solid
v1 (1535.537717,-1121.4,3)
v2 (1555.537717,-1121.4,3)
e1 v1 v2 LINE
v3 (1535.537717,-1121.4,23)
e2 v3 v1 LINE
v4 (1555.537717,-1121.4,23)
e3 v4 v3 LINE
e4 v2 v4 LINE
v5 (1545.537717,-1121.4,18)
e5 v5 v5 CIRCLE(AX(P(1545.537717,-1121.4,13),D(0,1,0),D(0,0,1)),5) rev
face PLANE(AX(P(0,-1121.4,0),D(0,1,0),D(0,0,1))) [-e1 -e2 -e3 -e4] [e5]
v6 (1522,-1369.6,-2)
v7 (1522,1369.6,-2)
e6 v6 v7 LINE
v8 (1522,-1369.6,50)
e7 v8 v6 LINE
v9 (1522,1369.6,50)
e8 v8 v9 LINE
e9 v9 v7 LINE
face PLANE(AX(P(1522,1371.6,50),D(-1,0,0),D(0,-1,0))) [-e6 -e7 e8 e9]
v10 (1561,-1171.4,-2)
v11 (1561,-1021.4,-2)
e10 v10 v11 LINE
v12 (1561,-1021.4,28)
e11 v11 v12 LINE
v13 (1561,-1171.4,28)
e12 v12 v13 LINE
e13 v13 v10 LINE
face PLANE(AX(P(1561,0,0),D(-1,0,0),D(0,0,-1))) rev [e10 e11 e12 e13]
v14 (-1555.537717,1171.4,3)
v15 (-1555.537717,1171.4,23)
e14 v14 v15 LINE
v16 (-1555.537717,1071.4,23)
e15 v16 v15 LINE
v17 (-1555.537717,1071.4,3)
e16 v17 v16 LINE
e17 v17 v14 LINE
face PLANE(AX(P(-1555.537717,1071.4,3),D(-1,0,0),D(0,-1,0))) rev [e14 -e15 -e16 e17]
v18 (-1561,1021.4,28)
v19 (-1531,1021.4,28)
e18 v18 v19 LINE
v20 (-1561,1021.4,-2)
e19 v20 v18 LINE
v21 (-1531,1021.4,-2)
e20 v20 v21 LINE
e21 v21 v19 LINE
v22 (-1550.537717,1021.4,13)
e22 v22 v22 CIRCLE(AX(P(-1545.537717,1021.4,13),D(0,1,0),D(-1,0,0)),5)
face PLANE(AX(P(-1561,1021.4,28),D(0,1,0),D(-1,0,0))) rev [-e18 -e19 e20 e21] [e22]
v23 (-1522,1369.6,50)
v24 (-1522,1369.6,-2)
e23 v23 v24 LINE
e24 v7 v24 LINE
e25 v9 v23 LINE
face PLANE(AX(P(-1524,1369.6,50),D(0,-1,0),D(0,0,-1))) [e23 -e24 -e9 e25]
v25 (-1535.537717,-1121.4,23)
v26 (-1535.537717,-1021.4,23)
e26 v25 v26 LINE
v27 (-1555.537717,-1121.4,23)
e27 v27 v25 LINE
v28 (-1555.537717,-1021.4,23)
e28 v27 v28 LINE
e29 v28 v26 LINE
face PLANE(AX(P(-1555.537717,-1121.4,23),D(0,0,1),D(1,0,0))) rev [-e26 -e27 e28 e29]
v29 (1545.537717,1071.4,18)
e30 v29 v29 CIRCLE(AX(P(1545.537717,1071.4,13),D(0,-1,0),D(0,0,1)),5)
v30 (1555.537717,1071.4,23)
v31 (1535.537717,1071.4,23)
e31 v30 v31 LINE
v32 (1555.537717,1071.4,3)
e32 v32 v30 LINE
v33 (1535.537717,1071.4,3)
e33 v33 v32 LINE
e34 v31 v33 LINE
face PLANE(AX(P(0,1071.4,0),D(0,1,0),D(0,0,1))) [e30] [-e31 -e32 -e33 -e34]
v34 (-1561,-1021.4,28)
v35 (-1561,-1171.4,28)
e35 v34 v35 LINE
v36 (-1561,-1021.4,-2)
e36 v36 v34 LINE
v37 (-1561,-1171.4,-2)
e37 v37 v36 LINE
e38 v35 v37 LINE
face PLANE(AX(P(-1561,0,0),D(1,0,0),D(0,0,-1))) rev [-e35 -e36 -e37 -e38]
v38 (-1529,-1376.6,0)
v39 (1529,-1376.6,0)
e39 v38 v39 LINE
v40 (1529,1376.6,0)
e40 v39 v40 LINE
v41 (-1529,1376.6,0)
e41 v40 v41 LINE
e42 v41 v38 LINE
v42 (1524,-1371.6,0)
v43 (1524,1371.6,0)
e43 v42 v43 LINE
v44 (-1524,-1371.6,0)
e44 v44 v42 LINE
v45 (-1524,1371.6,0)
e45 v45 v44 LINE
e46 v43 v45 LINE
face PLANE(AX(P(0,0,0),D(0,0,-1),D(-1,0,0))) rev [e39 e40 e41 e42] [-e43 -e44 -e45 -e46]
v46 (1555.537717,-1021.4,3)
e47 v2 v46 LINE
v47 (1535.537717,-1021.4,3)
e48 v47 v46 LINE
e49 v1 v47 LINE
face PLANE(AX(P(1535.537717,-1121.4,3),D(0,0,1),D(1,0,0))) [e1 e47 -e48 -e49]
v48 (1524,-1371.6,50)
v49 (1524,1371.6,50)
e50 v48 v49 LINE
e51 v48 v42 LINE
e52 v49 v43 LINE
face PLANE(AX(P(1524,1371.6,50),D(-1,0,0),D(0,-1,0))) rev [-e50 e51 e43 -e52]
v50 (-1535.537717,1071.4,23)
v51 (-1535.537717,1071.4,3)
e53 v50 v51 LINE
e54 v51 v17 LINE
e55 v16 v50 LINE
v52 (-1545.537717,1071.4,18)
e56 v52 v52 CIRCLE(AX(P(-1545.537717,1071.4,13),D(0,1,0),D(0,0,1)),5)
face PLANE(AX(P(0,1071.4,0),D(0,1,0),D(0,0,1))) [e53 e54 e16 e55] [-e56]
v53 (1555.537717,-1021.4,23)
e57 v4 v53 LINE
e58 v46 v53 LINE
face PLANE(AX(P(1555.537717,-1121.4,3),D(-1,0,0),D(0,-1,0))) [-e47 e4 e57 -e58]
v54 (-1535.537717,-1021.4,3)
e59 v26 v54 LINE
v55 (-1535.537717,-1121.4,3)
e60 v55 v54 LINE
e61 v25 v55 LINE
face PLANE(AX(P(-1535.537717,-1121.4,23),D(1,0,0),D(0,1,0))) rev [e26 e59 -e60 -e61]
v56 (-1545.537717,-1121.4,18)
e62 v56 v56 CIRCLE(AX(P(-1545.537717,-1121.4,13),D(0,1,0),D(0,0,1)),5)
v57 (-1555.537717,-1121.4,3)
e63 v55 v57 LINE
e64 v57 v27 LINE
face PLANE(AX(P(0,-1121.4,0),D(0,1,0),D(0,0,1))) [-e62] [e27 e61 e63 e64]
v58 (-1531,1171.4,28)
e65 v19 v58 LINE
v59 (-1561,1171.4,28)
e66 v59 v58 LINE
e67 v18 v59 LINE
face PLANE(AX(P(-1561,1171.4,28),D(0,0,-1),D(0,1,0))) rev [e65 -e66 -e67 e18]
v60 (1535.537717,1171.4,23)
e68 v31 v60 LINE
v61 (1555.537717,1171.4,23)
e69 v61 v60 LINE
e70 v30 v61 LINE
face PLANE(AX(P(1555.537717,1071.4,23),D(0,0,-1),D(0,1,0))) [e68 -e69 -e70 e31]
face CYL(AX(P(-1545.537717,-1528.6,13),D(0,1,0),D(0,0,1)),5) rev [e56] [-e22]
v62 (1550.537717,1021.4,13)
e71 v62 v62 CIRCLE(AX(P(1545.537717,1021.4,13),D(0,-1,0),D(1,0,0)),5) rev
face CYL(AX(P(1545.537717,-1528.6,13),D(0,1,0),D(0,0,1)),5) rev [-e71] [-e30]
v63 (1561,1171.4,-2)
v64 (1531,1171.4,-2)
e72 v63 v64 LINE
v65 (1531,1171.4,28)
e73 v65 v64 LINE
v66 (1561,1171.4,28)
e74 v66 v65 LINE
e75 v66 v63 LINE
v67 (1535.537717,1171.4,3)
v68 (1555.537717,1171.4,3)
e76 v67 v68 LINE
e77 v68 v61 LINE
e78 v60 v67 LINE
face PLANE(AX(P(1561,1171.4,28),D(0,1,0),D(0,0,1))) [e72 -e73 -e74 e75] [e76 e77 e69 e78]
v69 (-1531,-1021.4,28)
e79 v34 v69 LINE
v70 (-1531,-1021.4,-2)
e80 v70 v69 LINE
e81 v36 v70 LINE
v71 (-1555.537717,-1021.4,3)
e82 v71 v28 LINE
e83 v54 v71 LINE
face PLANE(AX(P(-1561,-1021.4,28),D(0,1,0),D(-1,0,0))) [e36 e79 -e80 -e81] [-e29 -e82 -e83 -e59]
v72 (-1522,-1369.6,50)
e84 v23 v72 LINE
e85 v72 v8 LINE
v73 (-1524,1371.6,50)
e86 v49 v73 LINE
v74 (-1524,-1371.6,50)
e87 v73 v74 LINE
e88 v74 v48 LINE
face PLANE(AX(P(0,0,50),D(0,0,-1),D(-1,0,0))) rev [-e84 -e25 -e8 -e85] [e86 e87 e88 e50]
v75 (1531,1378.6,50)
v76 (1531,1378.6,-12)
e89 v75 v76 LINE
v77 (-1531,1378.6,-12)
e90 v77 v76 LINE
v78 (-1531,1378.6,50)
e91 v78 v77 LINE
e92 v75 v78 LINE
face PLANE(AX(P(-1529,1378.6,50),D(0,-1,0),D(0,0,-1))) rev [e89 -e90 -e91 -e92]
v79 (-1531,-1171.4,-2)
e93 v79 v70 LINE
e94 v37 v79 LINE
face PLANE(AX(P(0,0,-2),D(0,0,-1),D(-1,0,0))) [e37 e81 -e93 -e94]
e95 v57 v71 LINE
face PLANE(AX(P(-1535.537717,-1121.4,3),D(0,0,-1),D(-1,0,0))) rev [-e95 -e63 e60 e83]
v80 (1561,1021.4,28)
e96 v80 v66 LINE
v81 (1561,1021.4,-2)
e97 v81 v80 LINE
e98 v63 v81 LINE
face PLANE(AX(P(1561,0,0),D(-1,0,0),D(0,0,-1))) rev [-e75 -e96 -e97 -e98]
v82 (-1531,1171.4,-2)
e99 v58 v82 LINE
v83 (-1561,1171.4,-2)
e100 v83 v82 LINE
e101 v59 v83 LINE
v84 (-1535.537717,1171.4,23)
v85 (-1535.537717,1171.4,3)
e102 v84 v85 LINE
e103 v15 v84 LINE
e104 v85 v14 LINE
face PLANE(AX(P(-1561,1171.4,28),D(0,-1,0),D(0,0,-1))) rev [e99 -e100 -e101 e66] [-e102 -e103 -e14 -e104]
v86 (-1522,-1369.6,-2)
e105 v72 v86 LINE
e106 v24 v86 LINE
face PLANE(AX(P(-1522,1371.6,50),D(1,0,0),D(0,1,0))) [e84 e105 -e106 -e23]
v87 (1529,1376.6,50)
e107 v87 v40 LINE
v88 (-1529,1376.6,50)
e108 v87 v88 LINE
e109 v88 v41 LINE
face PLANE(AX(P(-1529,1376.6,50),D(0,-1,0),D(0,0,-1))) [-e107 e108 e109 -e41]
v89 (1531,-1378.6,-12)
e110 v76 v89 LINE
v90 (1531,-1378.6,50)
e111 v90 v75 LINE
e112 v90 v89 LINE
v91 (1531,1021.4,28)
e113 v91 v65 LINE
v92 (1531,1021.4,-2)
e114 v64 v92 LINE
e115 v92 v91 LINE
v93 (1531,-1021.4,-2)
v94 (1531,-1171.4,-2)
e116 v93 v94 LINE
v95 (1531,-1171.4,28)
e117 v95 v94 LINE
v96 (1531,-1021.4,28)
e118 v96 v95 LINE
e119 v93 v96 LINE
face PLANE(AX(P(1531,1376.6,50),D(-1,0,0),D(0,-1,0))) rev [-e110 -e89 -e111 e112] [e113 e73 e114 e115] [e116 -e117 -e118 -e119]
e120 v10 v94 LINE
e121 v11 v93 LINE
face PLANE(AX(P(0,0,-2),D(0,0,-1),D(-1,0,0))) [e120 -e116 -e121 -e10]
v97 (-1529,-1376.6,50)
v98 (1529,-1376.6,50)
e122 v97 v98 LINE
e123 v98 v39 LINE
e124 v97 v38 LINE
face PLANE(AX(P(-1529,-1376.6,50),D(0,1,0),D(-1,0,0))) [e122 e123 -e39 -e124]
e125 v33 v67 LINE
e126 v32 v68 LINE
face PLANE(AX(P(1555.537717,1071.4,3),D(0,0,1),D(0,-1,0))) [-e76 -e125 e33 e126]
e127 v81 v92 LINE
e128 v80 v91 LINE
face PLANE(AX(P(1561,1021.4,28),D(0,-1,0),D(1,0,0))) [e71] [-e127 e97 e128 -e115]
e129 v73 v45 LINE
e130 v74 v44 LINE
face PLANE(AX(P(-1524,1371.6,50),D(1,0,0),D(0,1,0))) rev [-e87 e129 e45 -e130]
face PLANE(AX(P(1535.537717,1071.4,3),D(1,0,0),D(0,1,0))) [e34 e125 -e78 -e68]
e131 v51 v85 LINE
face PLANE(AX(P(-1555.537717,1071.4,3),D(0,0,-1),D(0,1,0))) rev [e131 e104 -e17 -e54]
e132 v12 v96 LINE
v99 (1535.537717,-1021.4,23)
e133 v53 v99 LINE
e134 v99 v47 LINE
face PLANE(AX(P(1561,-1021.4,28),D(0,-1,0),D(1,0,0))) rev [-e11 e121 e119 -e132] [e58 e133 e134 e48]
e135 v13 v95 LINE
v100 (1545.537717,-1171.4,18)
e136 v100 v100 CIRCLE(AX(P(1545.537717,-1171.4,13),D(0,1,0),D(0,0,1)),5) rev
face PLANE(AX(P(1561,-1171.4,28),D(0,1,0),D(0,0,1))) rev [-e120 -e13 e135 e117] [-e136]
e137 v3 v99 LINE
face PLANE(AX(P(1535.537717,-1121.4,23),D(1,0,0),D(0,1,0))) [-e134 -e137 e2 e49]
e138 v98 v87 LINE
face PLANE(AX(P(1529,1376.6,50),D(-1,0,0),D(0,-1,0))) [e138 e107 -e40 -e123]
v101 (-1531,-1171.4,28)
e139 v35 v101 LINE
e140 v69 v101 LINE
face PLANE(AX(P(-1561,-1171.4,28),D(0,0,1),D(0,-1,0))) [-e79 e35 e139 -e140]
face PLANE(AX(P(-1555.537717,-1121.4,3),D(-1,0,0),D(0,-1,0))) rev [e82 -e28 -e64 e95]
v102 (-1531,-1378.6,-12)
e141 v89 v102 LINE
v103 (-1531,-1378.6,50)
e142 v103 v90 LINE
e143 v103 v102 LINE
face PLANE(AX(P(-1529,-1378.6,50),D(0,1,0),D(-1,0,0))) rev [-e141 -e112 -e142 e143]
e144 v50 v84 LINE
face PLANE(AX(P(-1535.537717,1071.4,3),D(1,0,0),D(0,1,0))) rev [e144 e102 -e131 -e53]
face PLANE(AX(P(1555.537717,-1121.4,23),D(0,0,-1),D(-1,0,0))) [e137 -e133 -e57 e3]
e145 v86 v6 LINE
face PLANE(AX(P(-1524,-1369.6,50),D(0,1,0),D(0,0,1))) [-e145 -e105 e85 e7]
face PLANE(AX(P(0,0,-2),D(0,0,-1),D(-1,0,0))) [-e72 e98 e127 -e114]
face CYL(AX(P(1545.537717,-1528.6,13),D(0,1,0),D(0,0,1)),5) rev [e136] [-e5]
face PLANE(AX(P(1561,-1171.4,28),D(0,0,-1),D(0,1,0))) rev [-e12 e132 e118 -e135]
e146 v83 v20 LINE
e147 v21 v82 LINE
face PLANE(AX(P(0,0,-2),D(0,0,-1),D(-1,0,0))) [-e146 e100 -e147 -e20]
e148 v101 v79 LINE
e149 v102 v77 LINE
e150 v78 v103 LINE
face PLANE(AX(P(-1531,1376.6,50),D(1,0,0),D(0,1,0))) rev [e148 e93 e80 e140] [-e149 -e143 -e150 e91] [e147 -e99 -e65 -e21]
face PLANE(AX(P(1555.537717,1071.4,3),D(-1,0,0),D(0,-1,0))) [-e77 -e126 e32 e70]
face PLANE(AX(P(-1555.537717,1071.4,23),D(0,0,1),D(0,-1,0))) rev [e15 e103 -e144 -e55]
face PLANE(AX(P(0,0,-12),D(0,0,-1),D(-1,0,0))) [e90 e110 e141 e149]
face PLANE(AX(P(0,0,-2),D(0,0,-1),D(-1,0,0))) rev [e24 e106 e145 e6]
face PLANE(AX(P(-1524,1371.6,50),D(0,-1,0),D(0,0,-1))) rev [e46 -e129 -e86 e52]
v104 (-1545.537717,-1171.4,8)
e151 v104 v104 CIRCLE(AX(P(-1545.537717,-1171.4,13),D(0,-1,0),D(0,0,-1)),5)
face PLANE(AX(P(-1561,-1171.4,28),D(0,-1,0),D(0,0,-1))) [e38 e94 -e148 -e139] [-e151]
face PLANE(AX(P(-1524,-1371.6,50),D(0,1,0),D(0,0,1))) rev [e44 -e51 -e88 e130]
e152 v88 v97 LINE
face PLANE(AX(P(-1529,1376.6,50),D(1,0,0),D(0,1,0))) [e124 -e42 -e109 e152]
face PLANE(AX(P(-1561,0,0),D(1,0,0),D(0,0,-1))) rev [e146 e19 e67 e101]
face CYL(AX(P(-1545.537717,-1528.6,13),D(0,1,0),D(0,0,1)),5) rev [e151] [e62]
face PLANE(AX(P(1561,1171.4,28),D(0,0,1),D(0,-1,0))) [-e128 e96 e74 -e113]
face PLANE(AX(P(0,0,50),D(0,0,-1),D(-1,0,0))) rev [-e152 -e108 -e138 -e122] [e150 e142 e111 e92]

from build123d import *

# Parameters (mm, degrees)
SKETCH1_W           = 3058
SKETCH1_H           = 2753.2
SKETCH1_W_2         = 3048
SKETCH1_H_2         = 2743.2
BOSS_EXTRUDE1_DEPTH = 50
SHELL4_T            = 2
SKETCH2_W           = 30
SKETCH2_H           = 150
BOSS_EXTRUDE2_DEPTH = 30
SKETCH4_W           = 20
SKETCH4_H           = 20
CUT_EXTRUDE1_DEPTH  = 100
SKETCH5_W           = 20
SKETCH5_H           = 20
CUT_EXTRUDE2_DEPTH  = 100
MIRROR2_START       = -2
MIRROR2_DEPTH       = 30
MIRROR2_2_OUTLINE_W = 20
MIRROR2_2_OUTLINE_H = 100
MIRROR2_2_DEPTH     = 5
MIRROR2_START_2     = 23
MIRROR2_3_OUTLINE_W = 20
MIRROR2_3_OUTLINE_H = 100
MIRROR2_3_DEPTH     = 5
SKETCH7_W           = 3062
SKETCH7_H           = 2757.2
BOSS_EXTRUDE3_DEPTH = 10
SKETCH8_R           = 5
CUT_EXTRUDE3_DEPTH  = 2600


# Read off the part's stored shape, not the designer's step: Mirror2
with BuildPart() as part:
    # Sketch1 → Boss-Extrude1 (new body)
    with BuildSketch(Plane.XY):
        Rectangle(SKETCH1_W, SKETCH1_H)
        Rectangle(SKETCH1_W_2, SKETCH1_H_2, mode=Mode.SUBTRACT)
    extrude(amount=BOSS_EXTRUDE1_DEPTH)

    # Shell4
    shell4_openings = [part.faces().sort_by_distance(p)[0] for p in [
        (-1524.885212735, 0, 50),
    ]]
    offset(amount=SHELL4_T, openings=shell4_openings, kind=Kind.INTERSECTION)

    # Sketch2 → Boss-Extrude2 (add)
    with BuildSketch(Plane.ZY.offset(1531)):
        with Locations((13, 1096.4)):
            Rectangle(SKETCH2_W, SKETCH2_H)
    boss_extrude2 = extrude(amount=BOSS_EXTRUDE2_DEPTH)

    # Mirror1: Boss-Extrude2 across plane
    add(boss_extrude2.mirror(Plane.ZX))

    # Sketch4 → Cut-Extrude1 (cut)
    with BuildSketch(Plane(origin=(0, 1171.4, 0), x_dir=(1, 0, 0), z_dir=(0, 1, 0))):
        with Locations((-1545.537717339, -13)):
            Rectangle(SKETCH4_W, SKETCH4_H)
    extrude(amount=-CUT_EXTRUDE1_DEPTH, mode=Mode.SUBTRACT)

    # Sketch5 → Cut-Extrude2 (cut)
    with BuildSketch(Plane(origin=(0, -1021.4, 0), x_dir=(1, 0, 0), z_dir=(0, 1, 0))):
        with Locations((-1545.537717339, -13)):
            Rectangle(SKETCH5_W, SKETCH5_H)
    extrude(amount=-CUT_EXTRUDE2_DEPTH, mode=Mode.SUBTRACT)

    # Mirror2 outline → Mirror2 (add)
    with BuildSketch(Plane.XY.offset(MIRROR2_START)):
        Polygon((1531, 1171.4), (1531, 1021.4), (1561, 1021.4), (1561, 1171.4), (1555.537717339, 1171.4), (1555.537717339, 1071.4), (1535.537717339, 1071.4), (1535.537717339, 1171.4), align=None)
        Polygon((1535.537717339, -1021.4), (1531, -1021.4), (1531, -1171.4), (1561, -1171.4), (1561, -1021.4), (1555.537717339, -1021.4), (1555.537717339, -1121.4), (1535.537717339, -1121.4), align=None)
    extrude(amount=MIRROR2_DEPTH)

    # Mirror2 2 outline → Mirror2 2 (add)
    with BuildSketch(Plane.XY.offset(MIRROR2_START)):
        with Locations((1545.537717339, -1071.4)):
            Rectangle(MIRROR2_2_OUTLINE_W, MIRROR2_2_OUTLINE_H)
        with Locations((1545.537717339, 1121.4)):
            Rectangle(MIRROR2_2_OUTLINE_W, MIRROR2_2_OUTLINE_H)
    extrude(amount=MIRROR2_2_DEPTH)

    # Mirror2 3 outline → Mirror2 3 (add)
    with BuildSketch(Plane.XY.offset(MIRROR2_START_2)):
        with Locations((1545.537717339, -1071.4)):
            Rectangle(MIRROR2_3_OUTLINE_W, MIRROR2_3_OUTLINE_H)
        with Locations((1545.537717339, 1121.4)):
            Rectangle(MIRROR2_3_OUTLINE_W, MIRROR2_3_OUTLINE_H)
    extrude(amount=MIRROR2_3_DEPTH)

    # Sketch7 → Boss-Extrude3 (add)
    with BuildSketch(Plane(origin=(0, 0, -2), x_dir=(-1, 0, 0), z_dir=(0, 0, -1))):
        Rectangle(SKETCH7_W, SKETCH7_H)
    extrude(amount=BOSS_EXTRUDE3_DEPTH)

    # Sketch8 → Cut-Extrude3 (cut)
    with BuildSketch(Plane(origin=(0, 1071.4, 0), x_dir=(1, 0, 0), z_dir=(0, 1, 0))):
        with Locations(Location((-1545.537717339, -13, 0), (0, 0, 270))):
            Circle(SKETCH8_R)
    cut_extrude3 = extrude(amount=-CUT_EXTRUDE3_DEPTH, mode=Mode.SUBTRACT)

    # Mirror3: Cut-Extrude3 across plane
    add(cut_extrude3.mirror(Plane(origin=(0, 0, 0), x_dir=(0, 0, 1), z_dir=(1, 0, 0))), mode=Mode.SUBTRACT)


solid = part.part
